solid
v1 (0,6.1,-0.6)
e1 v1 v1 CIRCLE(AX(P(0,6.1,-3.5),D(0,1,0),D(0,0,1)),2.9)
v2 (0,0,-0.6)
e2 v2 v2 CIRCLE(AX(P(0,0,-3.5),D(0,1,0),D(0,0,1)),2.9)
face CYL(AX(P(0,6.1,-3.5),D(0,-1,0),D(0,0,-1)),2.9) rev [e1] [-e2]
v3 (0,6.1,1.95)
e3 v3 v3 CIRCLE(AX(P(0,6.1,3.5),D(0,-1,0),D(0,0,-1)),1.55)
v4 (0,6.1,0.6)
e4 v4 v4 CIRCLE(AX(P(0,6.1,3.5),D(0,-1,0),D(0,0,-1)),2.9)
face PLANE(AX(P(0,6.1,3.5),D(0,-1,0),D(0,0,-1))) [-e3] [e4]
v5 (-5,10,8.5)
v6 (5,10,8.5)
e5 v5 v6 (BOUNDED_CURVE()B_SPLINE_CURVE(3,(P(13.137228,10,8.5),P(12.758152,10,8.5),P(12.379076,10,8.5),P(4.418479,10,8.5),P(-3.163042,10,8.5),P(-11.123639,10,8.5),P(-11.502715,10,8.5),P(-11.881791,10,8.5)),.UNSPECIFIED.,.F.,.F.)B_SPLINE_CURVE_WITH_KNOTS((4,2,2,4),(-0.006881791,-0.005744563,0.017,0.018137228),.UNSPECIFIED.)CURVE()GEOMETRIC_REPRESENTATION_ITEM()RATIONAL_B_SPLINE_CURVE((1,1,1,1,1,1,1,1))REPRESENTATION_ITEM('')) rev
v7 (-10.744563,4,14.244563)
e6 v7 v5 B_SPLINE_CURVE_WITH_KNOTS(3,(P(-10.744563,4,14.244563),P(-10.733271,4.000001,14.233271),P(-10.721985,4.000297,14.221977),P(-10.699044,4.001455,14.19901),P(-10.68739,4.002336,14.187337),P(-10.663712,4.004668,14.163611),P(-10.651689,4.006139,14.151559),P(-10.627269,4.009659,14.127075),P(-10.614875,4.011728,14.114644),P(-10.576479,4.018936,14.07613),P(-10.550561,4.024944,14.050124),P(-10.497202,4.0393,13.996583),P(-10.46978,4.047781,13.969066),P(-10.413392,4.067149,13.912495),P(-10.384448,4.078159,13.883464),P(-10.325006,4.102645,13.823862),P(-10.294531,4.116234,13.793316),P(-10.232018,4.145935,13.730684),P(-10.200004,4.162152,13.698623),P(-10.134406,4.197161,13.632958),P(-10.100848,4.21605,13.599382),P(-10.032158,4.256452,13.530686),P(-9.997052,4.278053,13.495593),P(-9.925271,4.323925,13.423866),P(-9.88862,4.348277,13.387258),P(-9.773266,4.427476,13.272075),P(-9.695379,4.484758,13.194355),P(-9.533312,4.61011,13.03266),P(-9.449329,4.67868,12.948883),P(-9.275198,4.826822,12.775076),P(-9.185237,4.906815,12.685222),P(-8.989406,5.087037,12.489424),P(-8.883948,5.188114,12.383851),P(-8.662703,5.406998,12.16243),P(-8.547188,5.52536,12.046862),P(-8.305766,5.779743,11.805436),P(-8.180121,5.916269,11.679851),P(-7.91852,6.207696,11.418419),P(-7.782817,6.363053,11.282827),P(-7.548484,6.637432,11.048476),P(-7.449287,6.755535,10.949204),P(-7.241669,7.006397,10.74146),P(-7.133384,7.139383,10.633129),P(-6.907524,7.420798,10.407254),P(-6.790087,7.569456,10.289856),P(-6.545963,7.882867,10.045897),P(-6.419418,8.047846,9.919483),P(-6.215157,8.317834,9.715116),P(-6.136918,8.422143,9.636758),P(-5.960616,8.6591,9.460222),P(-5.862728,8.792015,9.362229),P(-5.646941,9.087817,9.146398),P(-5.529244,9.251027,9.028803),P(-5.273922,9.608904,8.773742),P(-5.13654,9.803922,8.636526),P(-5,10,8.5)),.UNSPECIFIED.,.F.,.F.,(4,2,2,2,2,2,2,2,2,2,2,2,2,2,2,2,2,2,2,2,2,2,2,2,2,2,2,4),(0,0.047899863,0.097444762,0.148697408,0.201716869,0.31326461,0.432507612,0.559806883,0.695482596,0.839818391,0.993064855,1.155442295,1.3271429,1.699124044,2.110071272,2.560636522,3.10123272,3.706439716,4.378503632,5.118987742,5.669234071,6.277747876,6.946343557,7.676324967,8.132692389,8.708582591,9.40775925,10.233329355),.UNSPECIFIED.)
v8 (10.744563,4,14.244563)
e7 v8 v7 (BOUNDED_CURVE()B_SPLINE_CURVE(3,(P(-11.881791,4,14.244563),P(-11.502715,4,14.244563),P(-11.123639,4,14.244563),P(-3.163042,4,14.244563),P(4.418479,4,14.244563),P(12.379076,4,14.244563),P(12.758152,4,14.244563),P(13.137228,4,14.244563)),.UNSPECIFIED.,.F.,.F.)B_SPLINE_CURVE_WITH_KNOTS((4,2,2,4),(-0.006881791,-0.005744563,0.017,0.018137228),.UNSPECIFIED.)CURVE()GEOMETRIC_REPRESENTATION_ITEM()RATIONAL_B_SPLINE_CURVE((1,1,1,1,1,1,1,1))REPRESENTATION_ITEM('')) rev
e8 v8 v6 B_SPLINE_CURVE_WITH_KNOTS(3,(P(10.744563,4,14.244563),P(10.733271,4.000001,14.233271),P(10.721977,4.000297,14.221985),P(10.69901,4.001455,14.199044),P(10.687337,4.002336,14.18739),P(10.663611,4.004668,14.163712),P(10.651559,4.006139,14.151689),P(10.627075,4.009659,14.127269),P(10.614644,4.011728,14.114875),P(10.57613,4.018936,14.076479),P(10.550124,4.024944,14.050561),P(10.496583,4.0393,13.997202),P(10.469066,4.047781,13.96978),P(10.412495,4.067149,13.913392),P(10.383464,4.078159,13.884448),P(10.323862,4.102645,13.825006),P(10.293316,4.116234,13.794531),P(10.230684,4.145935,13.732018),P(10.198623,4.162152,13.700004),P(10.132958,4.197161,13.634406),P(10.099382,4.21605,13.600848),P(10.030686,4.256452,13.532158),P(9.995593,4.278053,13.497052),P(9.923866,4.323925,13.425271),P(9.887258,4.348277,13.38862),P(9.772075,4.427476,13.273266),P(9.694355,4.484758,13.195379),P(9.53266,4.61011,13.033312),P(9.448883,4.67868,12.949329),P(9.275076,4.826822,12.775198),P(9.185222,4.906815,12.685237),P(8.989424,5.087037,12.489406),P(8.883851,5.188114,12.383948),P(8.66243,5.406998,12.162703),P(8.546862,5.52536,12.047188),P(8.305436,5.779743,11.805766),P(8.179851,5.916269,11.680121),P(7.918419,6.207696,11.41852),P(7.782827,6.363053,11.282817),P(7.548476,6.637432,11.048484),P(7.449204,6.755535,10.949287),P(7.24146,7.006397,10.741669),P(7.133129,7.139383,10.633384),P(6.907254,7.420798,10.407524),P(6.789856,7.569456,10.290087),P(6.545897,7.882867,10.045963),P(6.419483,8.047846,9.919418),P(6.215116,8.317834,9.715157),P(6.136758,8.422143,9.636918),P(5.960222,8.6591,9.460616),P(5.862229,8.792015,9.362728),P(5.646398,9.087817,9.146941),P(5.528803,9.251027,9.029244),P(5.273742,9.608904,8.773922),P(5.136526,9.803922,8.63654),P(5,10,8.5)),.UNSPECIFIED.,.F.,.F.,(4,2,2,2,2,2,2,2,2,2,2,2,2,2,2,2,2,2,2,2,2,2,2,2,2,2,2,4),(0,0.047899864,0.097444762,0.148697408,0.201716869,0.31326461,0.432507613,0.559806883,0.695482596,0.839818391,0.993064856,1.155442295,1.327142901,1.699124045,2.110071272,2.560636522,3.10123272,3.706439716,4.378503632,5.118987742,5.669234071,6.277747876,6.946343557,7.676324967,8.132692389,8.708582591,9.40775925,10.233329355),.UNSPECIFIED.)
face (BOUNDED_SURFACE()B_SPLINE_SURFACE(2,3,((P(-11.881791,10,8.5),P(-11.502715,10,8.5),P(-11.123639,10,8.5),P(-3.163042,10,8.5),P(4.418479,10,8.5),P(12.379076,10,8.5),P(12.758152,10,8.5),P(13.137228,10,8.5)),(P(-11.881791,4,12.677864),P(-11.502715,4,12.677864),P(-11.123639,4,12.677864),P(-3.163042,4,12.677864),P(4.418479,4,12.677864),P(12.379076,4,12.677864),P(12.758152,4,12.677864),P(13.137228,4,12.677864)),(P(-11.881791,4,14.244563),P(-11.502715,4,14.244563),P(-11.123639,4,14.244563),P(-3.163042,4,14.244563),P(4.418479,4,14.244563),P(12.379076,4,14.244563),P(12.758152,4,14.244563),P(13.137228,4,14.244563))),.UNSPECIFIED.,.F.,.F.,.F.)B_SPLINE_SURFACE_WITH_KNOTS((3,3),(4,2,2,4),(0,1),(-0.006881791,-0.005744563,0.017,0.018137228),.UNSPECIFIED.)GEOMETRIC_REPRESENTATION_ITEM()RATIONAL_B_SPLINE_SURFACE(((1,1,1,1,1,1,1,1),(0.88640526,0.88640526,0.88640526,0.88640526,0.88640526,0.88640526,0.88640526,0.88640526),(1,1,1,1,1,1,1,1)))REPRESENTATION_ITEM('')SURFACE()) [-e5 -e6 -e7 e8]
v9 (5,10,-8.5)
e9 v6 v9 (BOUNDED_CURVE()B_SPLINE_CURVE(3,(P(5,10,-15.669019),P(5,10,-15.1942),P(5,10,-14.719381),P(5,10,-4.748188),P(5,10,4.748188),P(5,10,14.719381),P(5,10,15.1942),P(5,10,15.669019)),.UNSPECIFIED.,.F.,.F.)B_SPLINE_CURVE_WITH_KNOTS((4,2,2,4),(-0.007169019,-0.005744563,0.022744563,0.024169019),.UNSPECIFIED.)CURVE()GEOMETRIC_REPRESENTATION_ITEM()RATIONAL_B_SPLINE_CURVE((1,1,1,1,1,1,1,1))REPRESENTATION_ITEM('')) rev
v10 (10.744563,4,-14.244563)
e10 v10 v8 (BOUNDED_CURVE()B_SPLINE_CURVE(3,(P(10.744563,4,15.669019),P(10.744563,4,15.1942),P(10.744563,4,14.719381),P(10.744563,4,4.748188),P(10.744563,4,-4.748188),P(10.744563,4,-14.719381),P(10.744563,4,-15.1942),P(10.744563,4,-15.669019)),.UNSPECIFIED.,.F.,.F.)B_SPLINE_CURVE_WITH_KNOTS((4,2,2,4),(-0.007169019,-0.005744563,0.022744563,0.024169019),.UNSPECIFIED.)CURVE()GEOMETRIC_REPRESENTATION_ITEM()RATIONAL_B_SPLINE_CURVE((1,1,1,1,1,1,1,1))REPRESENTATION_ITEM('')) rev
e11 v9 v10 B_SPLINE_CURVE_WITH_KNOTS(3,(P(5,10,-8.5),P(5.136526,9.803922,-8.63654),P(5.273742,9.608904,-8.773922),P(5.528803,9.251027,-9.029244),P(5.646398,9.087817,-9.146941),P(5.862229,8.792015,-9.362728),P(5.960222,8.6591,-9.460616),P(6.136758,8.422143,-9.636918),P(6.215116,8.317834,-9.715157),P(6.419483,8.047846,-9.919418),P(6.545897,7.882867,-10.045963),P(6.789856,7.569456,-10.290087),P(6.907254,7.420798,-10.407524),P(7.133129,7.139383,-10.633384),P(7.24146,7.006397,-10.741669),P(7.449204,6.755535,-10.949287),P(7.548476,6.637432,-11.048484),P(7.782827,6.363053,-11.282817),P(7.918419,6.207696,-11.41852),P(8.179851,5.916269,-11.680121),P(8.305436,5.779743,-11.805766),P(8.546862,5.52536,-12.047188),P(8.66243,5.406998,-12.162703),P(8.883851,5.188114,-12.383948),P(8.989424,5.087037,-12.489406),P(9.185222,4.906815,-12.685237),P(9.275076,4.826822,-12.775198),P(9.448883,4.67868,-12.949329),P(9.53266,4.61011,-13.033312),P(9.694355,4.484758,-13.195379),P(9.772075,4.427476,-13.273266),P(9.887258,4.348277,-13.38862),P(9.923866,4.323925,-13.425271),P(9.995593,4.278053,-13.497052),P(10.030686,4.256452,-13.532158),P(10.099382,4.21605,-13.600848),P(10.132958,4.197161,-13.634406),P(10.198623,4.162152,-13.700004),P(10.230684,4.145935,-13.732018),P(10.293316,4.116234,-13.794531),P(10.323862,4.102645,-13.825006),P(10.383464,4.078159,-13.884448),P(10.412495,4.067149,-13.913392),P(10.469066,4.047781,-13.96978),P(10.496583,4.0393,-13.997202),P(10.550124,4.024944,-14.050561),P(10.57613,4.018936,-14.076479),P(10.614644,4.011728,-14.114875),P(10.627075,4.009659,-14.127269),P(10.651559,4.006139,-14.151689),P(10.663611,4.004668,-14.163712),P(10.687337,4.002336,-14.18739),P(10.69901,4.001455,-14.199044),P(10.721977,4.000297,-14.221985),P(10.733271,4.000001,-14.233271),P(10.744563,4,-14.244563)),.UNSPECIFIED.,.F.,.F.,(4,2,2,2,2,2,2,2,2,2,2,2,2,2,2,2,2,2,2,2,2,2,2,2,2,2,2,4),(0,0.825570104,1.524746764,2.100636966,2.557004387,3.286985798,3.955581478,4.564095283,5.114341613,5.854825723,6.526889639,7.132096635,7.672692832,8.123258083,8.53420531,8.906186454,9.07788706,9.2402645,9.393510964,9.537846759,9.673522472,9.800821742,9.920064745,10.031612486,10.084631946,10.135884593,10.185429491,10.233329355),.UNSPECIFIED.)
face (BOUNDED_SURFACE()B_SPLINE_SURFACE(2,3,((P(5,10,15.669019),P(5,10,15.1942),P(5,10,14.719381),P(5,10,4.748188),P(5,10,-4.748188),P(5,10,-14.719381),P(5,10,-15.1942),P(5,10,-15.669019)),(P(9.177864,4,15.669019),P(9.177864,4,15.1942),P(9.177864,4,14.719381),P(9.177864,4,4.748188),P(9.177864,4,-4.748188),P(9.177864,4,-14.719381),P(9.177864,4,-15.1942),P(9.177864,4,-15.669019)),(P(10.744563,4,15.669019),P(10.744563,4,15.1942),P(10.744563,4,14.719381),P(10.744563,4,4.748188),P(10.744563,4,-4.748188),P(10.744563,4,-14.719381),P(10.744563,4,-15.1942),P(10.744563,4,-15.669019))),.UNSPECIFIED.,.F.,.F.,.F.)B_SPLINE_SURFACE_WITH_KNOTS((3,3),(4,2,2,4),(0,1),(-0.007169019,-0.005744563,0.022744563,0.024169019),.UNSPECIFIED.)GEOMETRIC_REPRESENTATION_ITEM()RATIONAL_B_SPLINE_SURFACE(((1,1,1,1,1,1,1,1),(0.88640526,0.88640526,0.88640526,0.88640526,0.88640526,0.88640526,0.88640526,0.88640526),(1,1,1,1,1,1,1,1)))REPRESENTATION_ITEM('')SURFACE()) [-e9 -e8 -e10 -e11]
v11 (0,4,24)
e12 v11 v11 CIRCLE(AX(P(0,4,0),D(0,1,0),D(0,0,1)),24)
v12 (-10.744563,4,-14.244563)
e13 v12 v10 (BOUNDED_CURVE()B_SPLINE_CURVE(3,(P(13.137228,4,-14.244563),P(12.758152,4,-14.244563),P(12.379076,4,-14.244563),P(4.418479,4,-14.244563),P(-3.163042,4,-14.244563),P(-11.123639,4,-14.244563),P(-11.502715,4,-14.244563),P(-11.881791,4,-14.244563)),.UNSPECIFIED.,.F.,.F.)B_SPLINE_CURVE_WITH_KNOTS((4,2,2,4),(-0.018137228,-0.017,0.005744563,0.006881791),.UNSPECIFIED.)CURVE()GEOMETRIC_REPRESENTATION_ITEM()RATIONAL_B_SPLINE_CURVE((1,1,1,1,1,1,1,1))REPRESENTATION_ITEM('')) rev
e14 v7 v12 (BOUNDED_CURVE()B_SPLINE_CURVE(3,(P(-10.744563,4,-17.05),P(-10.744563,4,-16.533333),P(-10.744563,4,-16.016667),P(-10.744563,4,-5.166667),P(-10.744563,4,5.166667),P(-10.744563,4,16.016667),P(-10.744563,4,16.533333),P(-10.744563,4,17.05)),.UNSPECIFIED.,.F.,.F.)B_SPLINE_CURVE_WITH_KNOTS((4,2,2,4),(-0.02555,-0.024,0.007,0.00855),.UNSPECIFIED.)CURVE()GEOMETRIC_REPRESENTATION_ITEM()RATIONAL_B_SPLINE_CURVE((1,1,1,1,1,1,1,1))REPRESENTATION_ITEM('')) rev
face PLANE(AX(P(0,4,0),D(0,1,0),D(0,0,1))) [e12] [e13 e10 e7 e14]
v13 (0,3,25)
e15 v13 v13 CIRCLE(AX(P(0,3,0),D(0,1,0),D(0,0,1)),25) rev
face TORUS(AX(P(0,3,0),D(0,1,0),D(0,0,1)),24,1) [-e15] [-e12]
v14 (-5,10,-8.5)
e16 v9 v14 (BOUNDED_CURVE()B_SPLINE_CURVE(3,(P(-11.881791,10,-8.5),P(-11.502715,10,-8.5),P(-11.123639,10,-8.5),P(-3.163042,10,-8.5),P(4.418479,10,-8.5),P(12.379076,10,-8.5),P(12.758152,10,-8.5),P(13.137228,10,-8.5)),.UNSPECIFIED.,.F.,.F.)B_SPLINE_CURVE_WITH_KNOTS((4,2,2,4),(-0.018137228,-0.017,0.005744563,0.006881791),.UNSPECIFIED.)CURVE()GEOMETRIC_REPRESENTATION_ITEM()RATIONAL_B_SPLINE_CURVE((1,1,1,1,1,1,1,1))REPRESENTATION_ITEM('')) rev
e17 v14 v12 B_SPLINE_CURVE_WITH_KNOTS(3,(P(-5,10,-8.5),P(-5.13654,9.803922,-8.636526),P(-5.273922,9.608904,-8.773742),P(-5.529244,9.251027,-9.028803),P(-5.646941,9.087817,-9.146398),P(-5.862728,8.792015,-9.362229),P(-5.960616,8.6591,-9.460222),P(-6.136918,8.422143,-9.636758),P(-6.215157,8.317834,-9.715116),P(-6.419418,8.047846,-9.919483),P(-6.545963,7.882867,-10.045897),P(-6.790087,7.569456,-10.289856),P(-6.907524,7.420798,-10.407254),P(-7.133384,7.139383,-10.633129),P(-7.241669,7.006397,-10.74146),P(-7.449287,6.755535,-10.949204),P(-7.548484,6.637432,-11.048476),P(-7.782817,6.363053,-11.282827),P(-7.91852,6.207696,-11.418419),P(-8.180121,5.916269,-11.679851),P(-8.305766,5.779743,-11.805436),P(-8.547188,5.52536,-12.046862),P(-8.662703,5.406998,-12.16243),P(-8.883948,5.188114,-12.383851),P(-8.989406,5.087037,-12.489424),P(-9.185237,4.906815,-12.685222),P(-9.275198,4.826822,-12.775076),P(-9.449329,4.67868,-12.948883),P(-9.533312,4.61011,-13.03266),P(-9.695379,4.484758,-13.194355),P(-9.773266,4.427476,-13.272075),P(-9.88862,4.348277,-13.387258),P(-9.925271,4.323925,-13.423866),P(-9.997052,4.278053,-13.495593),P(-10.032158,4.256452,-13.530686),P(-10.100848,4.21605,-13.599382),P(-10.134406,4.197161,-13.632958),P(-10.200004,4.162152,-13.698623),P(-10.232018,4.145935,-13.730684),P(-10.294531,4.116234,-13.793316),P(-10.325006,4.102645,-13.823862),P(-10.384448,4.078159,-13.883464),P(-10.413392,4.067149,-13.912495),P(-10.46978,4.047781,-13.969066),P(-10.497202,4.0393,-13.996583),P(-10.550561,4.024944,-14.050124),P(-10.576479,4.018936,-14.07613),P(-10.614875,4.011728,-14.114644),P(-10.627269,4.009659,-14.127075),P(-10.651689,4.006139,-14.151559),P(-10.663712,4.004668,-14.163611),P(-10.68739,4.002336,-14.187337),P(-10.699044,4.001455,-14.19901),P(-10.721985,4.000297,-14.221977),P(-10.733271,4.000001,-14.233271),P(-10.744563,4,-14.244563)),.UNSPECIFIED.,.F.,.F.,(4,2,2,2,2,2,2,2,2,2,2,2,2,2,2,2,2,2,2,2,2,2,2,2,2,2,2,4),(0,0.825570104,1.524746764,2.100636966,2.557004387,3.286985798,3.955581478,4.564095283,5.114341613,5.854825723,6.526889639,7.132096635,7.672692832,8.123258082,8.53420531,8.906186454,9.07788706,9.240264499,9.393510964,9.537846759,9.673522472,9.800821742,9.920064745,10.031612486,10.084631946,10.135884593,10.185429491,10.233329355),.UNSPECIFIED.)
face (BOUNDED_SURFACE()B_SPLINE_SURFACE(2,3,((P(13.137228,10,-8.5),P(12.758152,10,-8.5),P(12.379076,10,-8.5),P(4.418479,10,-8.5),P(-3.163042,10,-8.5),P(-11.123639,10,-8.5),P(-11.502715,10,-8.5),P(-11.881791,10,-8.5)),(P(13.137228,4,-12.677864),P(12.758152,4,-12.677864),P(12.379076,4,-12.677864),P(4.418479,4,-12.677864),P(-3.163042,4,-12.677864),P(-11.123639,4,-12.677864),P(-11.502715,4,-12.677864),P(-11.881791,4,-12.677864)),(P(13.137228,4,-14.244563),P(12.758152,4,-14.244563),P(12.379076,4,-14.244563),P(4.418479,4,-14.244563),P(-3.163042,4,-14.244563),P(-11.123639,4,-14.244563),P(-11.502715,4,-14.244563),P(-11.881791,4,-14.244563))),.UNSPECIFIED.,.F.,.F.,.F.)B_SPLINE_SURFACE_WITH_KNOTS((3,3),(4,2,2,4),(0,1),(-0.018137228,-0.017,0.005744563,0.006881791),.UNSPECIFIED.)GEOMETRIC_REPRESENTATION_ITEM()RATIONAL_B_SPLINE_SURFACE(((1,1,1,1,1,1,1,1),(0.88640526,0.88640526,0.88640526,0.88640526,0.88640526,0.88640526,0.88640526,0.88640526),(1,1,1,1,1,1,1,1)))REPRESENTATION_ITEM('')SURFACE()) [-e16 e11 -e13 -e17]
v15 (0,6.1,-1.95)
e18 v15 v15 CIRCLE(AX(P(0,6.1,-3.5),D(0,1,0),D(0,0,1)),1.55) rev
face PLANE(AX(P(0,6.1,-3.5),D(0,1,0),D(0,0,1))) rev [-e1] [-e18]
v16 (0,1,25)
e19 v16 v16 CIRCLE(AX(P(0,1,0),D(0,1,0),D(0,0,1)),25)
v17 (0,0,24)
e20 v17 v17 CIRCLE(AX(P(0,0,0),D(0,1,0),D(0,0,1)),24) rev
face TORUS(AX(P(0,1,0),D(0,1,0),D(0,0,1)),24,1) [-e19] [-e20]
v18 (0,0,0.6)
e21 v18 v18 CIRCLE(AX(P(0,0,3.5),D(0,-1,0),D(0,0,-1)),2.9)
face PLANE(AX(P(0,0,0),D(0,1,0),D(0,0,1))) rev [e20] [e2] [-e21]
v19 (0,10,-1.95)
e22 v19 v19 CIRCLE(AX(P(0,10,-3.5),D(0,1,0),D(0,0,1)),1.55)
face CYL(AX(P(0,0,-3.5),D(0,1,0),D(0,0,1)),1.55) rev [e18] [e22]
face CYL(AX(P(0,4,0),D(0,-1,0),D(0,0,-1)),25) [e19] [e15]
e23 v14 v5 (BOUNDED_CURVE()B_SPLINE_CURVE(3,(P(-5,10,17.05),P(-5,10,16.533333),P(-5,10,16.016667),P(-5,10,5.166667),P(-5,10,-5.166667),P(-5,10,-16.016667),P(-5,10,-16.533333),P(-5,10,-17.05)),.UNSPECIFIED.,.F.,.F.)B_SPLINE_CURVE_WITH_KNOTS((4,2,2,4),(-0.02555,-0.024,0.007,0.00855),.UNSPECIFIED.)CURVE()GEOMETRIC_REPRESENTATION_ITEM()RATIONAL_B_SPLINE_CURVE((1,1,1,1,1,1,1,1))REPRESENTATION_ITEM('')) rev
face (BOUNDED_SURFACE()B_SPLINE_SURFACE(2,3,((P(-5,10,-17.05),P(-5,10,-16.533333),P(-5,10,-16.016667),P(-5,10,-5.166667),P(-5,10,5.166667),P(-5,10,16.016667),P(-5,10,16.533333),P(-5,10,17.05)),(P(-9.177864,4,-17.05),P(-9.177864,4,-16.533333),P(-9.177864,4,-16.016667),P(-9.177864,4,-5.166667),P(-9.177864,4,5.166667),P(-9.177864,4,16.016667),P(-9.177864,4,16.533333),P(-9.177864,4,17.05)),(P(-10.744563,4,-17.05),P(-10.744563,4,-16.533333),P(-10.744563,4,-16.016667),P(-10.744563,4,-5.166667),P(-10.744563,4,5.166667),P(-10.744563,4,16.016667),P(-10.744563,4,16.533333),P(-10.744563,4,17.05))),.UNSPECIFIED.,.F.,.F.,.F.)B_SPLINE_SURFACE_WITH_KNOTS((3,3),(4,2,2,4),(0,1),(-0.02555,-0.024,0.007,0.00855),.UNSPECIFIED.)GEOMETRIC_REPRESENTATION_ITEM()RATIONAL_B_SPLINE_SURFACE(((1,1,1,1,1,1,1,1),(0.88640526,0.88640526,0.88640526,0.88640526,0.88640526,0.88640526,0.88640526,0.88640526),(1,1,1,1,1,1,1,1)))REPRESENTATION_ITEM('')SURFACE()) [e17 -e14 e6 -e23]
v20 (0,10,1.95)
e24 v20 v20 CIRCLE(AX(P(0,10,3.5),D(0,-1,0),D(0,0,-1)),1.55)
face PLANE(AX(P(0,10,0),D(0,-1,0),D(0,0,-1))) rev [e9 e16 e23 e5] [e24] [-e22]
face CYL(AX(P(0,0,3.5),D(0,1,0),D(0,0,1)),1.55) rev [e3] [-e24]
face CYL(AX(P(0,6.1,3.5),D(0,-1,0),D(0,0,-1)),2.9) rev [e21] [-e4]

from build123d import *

# Parameters (mm, degrees)
SKETCH2_R           = 25
BOSS_EXTRUDE1_DEPTH = 4
SKETCH3_W           = 10
SKETCH3_H           = 17
BOSS_EXTRUDE2_DEPTH = 6
FILLET1_START       = -8.5
FILLET1_DEPTH       = 17
FILLET1_START_2     = -10.744562747
FILLET1_2_DEPTH     = 21.489125494
FILLET1_START_3     = -15
FILLET1_3_DEPTH     = 30
SKETCH4_R           = 1.55
CUT_EXTRUDE1_DEPTH  = 37.742346142
SKETCH5_R           = 2.9
CUT_EXTRUDE2_DEPTH  = 6.1
FILLET2_R           = 1


with BuildPart() as part:
    # Sketch2 → Boss-Extrude1 (new body)
    with BuildSketch(Plane(origin=(0, 0, 0), x_dir=(1, 0, 0), z_dir=(0, 1, 0))):
        with Locations(Location((0, 0, 0), (0, 0, 270))):
            Circle(SKETCH2_R)
    extrude(amount=BOSS_EXTRUDE1_DEPTH)

    # Sketch3 → Boss-Extrude2 (add)
    with BuildSketch(Plane(origin=(0, 4, 0), x_dir=(1, 0, 0), z_dir=(0, 1, 0))):
        Rectangle(SKETCH3_W, SKETCH3_H)
    extrude(amount=BOSS_EXTRUDE2_DEPTH)

    # Fillet1: read off the stored shape, not the designer's step
    # Fillet1 outline → Fillet1 (add)
    with BuildSketch(Plane.XY.offset(FILLET1_START)):
        with BuildLine():
            Line((-10.744562647, 4), (-5, 4))
            Line((-5, 4), (-5, 10))
            add(Edge.make_bspline(
                [(-5, 10), (-9.177863743, 4), (-10.744562647, 4)],
                knots=[0, 0, 0, 1, 1, 1], degree=2, weights=[1, 0.88640526, 1]))
        make_face()
        with BuildLine():
            add(Edge.make_bspline(
                [(5, 10), (9.177863743, 4), (10.744562647, 4)],
                knots=[0, 0, 0, 1, 1, 1], degree=2, weights=[1, 0.88640526, 1]))
            Line((5, 10), (5, 4))
            Line((5, 4), (10.744562647, 4))
        make_face()
    extrude(amount=FILLET1_DEPTH)

    # Fillet1 2 outline → Fillet1 2 (add)
    with BuildSketch(Plane.YZ.offset(FILLET1_START_2)):
        with BuildLine():
            Line((4, 14.244562647), (4, 8.5))
            Line((4, 8.5), (10, 8.5))
            add(Edge.make_bspline(
                [(10, 8.5), (4, 12.677863743), (4, 14.244562647)],
                knots=[0, 0, 0, 1, 1, 1], degree=2, weights=[1, 0.88640526, 1]))
        make_face()
        with BuildLine():
            add(Edge.make_bspline(
                [(10, -8.5), (4, -12.677863743), (4, -14.244562647)],
                knots=[0, 0, 0, 1, 1, 1], degree=2, weights=[1, 0.88640526, 1]))
            Line((10, -8.5), (4, -8.5))
            Line((4, -8.5), (4, -14.244562647))
        make_face()
    extrude(amount=FILLET1_2_DEPTH)

    # Fillet1 3 outline → Fillet1 3 (cut)
    with BuildSketch(Plane.XY.offset(FILLET1_START_3)):
        with BuildLine():
            add(Edge.make_bspline(
                [(5, 10), (9.177863743, 4), (10.744562647, 4)],
                knots=[0, 0, 0, 1, 1, 1], degree=2, weights=[1, 0.88640526, 1]))
            Line((10.744562647, 4), (10.744562747, 10))
            Line((10.744562747, 10), (5, 10))
        make_face()
        with BuildLine():
            add(Edge.make_bspline(
                [(-5, 10), (-9.177863743, 4), (-10.744562647, 4)],
                knots=[0, 0, 0, 1, 1, 1], degree=2, weights=[1, 0.88640526, 1]))
            Line((-5, 10), (-10.744562747, 10))
            Line((-10.744562747, 10), (-10.744562647, 4))
        make_face()
    extrude(amount=FILLET1_3_DEPTH, mode=Mode.SUBTRACT)

    # Sketch4 → Cut-Extrude1 (cut, through all)
    with BuildSketch(Plane(origin=(0, 10, 0), x_dir=(1, 0, 0), z_dir=(0, 1, 0))):
        with Locations(Location((0, 3.5, 0), (0, 0, 270))):
            Circle(SKETCH4_R)
        with Locations(Location((0, -3.5, 0), (0, 0, 90))):
            Circle(SKETCH4_R)
    extrude(amount=-CUT_EXTRUDE1_DEPTH, mode=Mode.SUBTRACT)

    # Sketch5 → Cut-Extrude2 (cut)
    with BuildSketch(Plane.XZ):
        with Locations(Location((0, 3.5, 0), (0, 0, 270))):
            Circle(SKETCH5_R)
        with Locations(Location((0, -3.5, 0), (0, 0, 90))):
            Circle(SKETCH5_R)
    extrude(amount=-CUT_EXTRUDE2_DEPTH, mode=Mode.SUBTRACT)

    # Fillet2
    fillet2_edges = [part.edges().sort_by_distance(p)[0] for p in [
        (0, 0, -25),
        (0, 4, -25),
    ]]
    fillet(fillet2_edges, radius=FILLET2_R)


solid = part.part
